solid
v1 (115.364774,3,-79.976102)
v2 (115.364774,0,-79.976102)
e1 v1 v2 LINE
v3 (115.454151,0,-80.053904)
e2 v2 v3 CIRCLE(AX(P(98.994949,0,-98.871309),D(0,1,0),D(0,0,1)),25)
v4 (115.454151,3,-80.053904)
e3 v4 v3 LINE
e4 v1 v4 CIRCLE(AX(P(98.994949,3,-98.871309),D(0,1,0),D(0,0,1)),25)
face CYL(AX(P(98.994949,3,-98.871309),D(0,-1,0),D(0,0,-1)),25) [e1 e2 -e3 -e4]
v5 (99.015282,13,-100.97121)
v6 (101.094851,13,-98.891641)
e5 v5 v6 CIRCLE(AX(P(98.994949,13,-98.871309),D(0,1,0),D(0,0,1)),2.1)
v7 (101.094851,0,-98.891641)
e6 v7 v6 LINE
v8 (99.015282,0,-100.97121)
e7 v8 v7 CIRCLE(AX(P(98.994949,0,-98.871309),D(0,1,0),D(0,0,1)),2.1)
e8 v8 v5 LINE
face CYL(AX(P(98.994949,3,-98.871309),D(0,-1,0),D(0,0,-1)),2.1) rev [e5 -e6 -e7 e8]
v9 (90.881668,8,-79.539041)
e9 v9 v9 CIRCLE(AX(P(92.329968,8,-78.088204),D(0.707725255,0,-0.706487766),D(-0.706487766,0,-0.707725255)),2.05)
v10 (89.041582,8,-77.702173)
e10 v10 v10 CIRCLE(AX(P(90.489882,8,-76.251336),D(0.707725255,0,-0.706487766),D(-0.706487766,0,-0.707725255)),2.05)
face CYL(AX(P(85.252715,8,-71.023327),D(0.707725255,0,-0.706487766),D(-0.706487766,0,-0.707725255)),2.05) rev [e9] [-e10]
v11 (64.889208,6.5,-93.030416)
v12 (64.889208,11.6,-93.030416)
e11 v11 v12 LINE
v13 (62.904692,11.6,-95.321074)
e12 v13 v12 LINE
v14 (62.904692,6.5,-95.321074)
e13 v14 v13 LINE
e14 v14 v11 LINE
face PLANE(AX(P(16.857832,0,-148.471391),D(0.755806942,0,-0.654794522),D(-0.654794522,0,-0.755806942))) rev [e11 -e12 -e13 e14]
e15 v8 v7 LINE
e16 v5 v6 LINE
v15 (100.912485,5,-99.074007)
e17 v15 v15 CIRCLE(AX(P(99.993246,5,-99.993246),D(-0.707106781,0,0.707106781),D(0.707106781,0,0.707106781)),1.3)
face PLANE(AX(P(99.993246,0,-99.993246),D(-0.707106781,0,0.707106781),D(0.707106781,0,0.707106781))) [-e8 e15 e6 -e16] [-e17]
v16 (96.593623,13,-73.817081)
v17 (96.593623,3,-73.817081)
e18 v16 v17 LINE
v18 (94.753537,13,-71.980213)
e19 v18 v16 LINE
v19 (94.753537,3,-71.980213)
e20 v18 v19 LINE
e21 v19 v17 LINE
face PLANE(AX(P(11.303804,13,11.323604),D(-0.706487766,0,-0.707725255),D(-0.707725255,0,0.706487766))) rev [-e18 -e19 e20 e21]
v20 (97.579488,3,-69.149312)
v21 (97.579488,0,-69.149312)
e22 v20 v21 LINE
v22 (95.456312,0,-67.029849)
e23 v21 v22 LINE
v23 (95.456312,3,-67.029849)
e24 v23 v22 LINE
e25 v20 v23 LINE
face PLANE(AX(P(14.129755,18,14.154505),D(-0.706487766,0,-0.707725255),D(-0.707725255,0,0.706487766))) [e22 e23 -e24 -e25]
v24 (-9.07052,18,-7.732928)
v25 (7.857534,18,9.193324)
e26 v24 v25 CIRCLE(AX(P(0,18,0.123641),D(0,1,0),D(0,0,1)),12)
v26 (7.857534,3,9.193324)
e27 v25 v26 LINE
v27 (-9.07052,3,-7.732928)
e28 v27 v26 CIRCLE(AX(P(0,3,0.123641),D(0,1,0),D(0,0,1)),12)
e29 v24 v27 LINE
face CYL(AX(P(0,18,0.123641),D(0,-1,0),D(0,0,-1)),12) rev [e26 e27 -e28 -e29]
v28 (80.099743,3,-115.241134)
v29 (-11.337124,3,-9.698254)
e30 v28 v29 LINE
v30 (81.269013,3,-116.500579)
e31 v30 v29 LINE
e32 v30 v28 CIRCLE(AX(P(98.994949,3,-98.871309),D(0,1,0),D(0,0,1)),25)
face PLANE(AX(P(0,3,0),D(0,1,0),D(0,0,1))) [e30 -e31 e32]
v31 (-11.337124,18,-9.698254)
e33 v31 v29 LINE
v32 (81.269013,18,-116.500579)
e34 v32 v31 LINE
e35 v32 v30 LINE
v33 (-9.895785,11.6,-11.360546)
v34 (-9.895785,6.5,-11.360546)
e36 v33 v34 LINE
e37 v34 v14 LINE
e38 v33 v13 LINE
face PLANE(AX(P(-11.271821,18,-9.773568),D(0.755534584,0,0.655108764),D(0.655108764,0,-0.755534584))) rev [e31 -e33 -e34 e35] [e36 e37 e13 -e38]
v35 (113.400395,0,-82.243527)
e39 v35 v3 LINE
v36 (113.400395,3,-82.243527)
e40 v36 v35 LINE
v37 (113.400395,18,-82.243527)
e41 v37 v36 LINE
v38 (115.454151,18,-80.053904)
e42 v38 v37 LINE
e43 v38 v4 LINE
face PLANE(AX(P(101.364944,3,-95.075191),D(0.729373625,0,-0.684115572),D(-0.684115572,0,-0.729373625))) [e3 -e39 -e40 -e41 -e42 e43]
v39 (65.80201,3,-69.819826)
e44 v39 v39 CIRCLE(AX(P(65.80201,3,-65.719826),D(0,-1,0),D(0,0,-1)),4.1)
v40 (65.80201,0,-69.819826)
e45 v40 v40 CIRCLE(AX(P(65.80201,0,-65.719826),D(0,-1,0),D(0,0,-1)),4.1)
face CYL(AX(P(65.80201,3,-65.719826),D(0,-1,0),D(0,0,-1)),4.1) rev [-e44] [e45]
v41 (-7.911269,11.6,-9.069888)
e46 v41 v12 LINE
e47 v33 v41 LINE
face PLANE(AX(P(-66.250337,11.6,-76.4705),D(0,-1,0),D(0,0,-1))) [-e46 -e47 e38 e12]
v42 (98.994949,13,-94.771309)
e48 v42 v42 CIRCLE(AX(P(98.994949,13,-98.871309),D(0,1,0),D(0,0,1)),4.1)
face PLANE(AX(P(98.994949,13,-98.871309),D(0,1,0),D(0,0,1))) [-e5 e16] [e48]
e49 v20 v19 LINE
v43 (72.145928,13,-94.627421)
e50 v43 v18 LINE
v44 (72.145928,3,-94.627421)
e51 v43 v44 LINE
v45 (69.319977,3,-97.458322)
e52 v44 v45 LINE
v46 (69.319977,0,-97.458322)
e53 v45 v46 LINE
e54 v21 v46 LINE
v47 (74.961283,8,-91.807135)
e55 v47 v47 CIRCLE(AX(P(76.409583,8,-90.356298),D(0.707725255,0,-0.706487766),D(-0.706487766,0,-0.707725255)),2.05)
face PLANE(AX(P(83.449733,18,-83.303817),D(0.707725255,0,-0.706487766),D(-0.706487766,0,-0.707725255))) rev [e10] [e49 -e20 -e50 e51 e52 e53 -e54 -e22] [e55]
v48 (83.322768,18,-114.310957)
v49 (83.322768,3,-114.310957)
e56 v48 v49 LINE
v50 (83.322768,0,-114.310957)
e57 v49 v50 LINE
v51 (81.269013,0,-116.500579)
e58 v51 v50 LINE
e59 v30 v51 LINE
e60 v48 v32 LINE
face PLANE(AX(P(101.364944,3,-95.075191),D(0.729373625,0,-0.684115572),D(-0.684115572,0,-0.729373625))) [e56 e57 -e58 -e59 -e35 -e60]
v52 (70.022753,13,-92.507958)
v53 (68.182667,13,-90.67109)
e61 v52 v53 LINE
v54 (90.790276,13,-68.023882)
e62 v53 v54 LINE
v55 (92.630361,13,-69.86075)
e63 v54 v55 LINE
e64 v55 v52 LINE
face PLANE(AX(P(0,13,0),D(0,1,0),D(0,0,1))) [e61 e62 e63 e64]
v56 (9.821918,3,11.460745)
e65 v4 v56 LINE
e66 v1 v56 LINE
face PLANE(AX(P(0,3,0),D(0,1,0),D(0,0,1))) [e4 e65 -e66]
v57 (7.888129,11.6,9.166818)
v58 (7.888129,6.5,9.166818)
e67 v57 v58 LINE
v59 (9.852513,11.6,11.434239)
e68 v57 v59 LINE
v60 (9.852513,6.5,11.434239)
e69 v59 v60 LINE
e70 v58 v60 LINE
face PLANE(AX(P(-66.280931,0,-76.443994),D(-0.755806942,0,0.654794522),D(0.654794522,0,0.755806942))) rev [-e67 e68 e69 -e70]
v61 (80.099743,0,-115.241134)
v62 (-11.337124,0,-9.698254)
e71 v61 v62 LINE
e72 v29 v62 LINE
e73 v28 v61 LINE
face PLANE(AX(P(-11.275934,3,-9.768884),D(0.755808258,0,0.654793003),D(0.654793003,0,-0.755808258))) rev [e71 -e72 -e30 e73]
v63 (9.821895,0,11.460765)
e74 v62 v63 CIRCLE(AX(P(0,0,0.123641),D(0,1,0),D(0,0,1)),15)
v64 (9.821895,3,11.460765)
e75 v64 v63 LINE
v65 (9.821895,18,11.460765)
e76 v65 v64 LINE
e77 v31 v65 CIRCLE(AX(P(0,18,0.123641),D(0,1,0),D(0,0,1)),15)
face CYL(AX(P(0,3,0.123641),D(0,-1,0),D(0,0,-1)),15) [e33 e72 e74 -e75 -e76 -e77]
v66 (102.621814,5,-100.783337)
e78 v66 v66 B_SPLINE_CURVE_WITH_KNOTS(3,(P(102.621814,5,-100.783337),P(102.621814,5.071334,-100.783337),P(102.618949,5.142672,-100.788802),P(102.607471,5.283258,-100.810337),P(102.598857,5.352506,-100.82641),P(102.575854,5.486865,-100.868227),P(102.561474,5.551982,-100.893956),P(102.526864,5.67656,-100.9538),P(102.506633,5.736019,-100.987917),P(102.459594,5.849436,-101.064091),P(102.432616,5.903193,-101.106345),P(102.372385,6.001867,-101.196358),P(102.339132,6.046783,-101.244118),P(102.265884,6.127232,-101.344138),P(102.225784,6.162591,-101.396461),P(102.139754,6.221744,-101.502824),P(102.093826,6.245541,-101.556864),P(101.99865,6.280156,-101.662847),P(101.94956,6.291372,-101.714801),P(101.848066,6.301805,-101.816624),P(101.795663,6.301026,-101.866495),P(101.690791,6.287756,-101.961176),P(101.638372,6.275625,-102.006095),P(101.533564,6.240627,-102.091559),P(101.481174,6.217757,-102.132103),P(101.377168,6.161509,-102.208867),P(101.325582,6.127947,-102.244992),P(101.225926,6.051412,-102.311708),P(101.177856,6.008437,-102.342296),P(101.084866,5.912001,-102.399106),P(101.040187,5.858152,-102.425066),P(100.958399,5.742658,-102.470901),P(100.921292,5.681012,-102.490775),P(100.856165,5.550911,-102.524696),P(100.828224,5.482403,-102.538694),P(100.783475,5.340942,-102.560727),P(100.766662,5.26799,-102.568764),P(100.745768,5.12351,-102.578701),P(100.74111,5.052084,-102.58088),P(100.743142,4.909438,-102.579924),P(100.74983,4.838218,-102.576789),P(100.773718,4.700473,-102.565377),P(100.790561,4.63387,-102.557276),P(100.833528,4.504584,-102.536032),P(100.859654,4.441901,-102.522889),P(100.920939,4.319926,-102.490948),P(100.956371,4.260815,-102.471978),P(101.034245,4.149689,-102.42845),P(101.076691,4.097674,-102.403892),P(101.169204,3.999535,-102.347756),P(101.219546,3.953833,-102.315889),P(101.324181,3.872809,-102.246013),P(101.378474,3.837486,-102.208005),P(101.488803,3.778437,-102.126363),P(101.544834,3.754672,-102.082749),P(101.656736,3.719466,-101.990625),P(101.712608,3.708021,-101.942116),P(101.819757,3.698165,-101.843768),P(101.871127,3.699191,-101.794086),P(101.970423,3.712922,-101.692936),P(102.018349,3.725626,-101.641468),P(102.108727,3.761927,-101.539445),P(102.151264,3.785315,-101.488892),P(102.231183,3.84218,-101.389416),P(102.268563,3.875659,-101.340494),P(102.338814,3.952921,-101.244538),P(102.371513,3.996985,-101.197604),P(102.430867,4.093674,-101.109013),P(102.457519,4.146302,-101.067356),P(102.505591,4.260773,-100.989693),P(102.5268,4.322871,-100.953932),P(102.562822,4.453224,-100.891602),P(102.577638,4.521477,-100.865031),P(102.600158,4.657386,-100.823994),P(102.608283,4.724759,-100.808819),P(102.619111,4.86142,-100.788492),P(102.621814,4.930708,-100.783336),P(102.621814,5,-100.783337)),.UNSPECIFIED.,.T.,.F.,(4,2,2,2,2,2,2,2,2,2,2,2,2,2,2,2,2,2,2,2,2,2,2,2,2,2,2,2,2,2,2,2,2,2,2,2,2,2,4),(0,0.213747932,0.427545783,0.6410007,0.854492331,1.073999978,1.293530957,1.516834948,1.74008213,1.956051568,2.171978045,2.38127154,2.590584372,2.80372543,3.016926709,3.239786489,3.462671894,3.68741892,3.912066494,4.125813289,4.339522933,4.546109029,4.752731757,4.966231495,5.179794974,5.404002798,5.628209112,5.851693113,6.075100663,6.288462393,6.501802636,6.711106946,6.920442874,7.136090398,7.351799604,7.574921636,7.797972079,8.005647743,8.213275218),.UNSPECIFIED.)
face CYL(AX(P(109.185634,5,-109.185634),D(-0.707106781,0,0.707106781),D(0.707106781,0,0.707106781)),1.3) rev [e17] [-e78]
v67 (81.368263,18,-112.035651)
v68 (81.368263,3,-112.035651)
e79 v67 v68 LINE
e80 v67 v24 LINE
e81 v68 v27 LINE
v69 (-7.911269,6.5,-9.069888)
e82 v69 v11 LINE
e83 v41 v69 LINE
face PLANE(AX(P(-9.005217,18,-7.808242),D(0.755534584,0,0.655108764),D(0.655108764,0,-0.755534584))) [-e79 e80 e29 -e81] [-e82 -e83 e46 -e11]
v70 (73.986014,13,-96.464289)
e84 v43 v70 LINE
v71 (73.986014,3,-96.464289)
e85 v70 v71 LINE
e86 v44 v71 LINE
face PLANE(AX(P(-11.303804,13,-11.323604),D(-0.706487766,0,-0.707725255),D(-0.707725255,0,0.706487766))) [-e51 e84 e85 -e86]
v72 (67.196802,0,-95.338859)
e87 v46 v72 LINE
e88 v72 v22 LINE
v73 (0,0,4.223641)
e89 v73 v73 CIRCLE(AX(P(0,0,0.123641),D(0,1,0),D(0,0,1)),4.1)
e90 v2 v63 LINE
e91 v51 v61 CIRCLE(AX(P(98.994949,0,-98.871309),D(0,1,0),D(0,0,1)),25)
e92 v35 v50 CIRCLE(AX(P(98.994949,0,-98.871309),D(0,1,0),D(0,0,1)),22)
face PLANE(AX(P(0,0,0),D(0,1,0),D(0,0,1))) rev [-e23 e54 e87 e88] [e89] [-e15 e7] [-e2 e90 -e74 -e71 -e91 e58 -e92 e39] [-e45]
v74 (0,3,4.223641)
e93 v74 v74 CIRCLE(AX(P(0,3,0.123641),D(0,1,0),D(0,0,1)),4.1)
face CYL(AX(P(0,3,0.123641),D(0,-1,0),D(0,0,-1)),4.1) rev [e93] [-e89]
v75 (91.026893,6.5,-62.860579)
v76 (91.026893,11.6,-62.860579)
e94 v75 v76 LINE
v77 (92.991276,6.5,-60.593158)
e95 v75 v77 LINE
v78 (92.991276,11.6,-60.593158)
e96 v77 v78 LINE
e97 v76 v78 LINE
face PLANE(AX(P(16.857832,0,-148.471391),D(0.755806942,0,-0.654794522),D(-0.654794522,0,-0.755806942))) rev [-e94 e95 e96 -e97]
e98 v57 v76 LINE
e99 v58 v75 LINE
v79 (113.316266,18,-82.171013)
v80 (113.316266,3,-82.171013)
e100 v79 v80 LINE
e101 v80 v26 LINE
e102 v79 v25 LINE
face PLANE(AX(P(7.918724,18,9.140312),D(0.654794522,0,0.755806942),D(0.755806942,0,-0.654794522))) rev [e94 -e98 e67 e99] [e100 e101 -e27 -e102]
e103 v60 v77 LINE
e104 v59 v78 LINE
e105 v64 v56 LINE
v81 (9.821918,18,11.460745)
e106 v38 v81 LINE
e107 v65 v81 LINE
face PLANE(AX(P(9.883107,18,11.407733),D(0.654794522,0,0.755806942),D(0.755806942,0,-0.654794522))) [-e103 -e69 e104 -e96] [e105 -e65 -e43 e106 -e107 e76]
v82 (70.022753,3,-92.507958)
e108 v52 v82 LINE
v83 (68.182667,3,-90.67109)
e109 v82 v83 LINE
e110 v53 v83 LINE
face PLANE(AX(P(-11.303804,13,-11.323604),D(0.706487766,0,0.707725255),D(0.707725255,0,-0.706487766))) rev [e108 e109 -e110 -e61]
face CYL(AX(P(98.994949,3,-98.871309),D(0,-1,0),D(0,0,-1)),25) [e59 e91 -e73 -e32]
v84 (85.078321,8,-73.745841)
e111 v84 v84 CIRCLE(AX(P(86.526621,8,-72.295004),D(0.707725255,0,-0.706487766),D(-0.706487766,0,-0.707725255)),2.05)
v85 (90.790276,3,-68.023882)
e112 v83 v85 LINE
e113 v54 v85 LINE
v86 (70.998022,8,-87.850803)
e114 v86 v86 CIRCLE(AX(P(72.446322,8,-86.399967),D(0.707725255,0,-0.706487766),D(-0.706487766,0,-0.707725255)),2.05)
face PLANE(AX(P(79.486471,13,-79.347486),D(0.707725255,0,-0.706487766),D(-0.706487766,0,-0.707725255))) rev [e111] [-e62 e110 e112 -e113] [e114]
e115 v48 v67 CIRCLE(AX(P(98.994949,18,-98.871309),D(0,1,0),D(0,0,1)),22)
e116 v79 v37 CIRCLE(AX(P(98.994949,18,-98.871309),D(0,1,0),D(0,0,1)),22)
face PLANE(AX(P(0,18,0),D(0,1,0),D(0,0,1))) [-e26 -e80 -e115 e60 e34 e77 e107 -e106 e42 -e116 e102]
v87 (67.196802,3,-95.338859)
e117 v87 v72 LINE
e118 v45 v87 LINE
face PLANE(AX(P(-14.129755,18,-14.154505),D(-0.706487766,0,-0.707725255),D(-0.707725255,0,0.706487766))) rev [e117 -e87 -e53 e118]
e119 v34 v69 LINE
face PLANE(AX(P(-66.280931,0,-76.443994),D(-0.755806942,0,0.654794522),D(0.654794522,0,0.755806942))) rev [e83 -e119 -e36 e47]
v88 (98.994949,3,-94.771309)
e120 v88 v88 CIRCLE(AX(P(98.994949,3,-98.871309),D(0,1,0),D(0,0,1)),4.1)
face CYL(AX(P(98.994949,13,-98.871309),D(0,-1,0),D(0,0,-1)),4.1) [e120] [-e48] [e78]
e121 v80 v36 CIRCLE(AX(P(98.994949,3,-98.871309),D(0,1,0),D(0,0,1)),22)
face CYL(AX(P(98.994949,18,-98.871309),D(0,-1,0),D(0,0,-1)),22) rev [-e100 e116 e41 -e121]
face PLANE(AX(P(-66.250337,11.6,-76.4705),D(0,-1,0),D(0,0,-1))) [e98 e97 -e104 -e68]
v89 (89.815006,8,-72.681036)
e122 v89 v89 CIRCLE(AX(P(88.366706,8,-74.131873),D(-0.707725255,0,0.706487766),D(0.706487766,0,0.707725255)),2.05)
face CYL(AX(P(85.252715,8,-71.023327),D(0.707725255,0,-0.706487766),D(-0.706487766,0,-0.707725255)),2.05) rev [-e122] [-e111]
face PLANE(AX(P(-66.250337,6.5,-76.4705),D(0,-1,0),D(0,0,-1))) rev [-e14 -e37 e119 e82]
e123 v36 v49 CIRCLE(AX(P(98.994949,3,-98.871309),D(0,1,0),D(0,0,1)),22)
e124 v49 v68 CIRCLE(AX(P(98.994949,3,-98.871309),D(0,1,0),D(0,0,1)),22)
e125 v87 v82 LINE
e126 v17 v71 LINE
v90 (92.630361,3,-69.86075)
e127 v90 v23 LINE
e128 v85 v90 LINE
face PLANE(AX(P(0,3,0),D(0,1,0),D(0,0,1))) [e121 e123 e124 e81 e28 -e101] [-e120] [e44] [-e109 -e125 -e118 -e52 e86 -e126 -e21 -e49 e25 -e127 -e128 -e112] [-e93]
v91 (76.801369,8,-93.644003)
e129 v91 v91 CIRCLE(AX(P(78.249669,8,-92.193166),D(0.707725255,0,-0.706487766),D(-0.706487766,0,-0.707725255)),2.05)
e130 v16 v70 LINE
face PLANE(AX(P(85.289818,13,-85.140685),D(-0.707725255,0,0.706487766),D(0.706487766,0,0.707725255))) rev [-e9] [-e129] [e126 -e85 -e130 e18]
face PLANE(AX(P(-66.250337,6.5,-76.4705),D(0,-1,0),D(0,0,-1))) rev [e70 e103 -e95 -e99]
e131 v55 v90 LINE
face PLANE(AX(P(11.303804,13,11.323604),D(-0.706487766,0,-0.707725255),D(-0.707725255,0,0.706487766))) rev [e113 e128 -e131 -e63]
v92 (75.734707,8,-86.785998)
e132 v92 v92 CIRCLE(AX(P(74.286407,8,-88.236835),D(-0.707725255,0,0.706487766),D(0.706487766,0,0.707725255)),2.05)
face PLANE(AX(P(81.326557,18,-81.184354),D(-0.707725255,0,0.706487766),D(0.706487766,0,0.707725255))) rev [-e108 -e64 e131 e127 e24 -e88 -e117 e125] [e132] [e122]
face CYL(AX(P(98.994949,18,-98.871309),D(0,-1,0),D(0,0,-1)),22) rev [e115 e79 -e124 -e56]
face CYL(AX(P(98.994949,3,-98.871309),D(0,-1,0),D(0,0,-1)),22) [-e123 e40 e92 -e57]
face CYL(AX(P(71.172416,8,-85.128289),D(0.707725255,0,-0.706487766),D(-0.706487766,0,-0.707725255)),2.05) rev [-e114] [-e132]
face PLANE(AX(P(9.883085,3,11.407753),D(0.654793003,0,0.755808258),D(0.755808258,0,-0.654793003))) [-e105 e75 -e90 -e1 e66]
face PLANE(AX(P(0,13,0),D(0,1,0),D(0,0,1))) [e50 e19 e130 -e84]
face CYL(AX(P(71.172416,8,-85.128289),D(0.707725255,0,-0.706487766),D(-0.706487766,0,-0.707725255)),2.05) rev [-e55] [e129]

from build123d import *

# Parameters (mm, degrees)
SKETCH_2_R               = 2.1
SKETCH_2_R_2             = 4.1
EXTRUDE_2_DEPTH          = 3
EXTRUDE_3_DEPTH          = 15
SKETCH_4_R               = 4.1
SKETCH_4_R_2             = 2.1
EXTRUDE_4_DEPTH          = 10
EXTRUDE_START            = -13
EXTRUDE_5_DEPTH          = 13
SKETCH_7_R               = 1.3
CUT_EXTRUDE_1_DEPTH      = 13
CUT_EXTRUDE_2_DEPTH      = 174.68818701
CUT_EXTRUDE_2_DEPTH_BACK = 174.68818701
SKETCH_8_W               = 110
SKETCH_8_H               = 2.6
SKETCH_8_H_2             = 2.5
CUT_EXTRUDE_3_DEPTH      = 172.969913078
CUT_EXTRUDE_3_DEPTH_BACK = 172.969913078
EXTRUDE_6_DEPTH          = 10
SKETCH_11_R              = 2
CUT_EXTRUDE_4_DEPTH      = 10
SKETCH_13_R              = 2.05
CUT_EXTRUDE_5_DEPTH      = 10
SKETCH_14_R              = 4.1
EXTRUDE_7_DEPTH          = 3
CUT_EXTRUDE_6_DEPTH      = 3


# Read off the part's stored shape, not the designer's step: 凸台-拉伸3, 凸台-拉伸5
with BuildPart() as part:
    # 草图2 → 凸台-拉伸2 (new body)
    with BuildSketch(Plane(origin=(0, 0, 0), x_dir=(1, 0, 0), z_dir=(0, 1, 0))):
        with BuildLine():
            Line((80.099742919, 115.241133642), (-11.337123868, 9.698254241))
            ThreePointArc((-11.337123868, 9.698254241), (-10.606601718, -10.730242528), (9.821895051, -11.460764678))
            Line((9.821895051, -11.460764678), (115.364774452, 79.976102109))
            ThreePointArc((115.364774452, 79.976102109), (115.409508589, 80.014950331), (115.454150533, 80.053904459))
            Line((115.454150533, 80.053904459), (113.400395441, 82.243526883))
            ThreePointArc((113.400395441, 82.243526883), (115.041169115, 113.92185113), (83.322768112, 114.310956698))
            Line((83.322768112, 114.310956698), (81.26901302, 116.500579122))
            ThreePointArc((81.26901302, 116.500579122), (80.673552706, 115.880906565), (80.099742919, 115.241133642))
        make_face()
        with Locations(Location((98.994949366, 98.871308556, 0), (0, 0, 270))):
            Circle(SKETCH_2_R, mode=Mode.SUBTRACT)
        with Locations(Location((0, -0.12364081, 0), (0, 0, 270))):
            Circle(SKETCH_2_R_2, mode=Mode.SUBTRACT)
        with Locations(Location((70.710678119, 70.587037309, 0), (0, 0, 270))):
            Circle(SKETCH_2_R_2, mode=Mode.SUBTRACT)
    extrude(amount=EXTRUDE_2_DEPTH)

    # 凸台-拉伸3 outline → 凸台-拉伸3 (add)
    with BuildSketch(Plane(origin=(0, 3, 0), x_dir=(1, 0, 0), z_dir=(0, 1, 0))):
        with BuildLine():
            ThreePointArc((-11.337123868, 9.698254241), (-10.606601718, -10.730242528), (9.821895051, -11.460764678))
            Line((9.821895051, -11.460764678), (115.454150533, 80.053904459))
            Line((115.454150533, 80.053904459), (113.400395441, 82.243526883))
            ThreePointArc((113.400395441, 82.243526883), (113.358376595, 82.207216674), (113.316266225, 82.171012648))
            Line((113.316266225, 82.171012648), (7.857534265, -9.193324116))
            ThreePointArc((7.857534265, -9.193324116), (-8.484829636, -8.609373899), (-9.07051987, 7.732927734))
            Line((-9.07051987, 7.732927734), (81.368262538, 112.03565098))
            ThreePointArc((81.368262538, 112.03565098), (82.306692779, 113.206652712), (83.322768112, 114.310956698))
            Line((83.322768112, 114.310956698), (81.26901302, 116.500579122))
            Line((81.26901302, 116.500579122), (-11.337123868, 9.698254241))
        make_face()
    extrude(amount=EXTRUDE_3_DEPTH)

    # 草图4 → 凸台-拉伸4 (add)
    with BuildSketch(Plane(origin=(0, 3, 0), x_dir=(1, 0, 0), z_dir=(0, 1, 0))):
        with Locations(Location((98.994949366, 98.871308556, 0), (0, 0, 270))):
            Circle(SKETCH_4_R)
        with Locations(Location((98.994949366, 98.871308556, 0), (0, 0, 270))):
            Circle(SKETCH_4_R_2, mode=Mode.SUBTRACT)
    extrude(amount=EXTRUDE_4_DEPTH)

    # 凸台-拉伸5 outline → 凸台-拉伸5 (add)
    with BuildSketch(Plane(origin=(0, 13, 0), x_dir=(1, 0, 0), z_dir=(0, 1, 0)).offset(EXTRUDE_START)):
        with BuildLine():
            ThreePointArc((101.094850935, 98.891640782), (100.479873606, 100.356232796), (99.015281592, 100.971210125))
            Line((99.015281592, 100.971210125), (101.094850935, 98.891640782))
        make_face()
    extrude(amount=EXTRUDE_5_DEPTH)

    # 草图7 → 切除-拉伸1 (cut)
    with BuildSketch(Plane(origin=(99.993245858, 0, -99.993245858), x_dir=(0.7071067811865475, 0, 0.7071067811865477), z_dir=(-0.7071067811865477, 0, 0.7071067811865475))):
        with Locations((0, 5)):
            Circle(SKETCH_7_R)
    extrude(amount=-CUT_EXTRUDE_1_DEPTH, mode=Mode.SUBTRACT)

    # 草图8 → 切除-拉伸2 (cut, two sides: drawn at the far end of the back side and taken through both)
    with BuildSketch(Plane(origin=(9.883107451, 0, 11.40773322), x_dir=(0.75580694217799, 0, -0.6547945220873159), z_dir=(0.6547945220873159, 0, 0.75580694217799)).offset(-CUT_EXTRUDE_2_DEPTH_BACK)):
        with Locations((54.959520341, 10.3)):
            Rectangle(SKETCH_8_W, SKETCH_8_H)
        with Locations((54.959520341, 7.75)):
            Rectangle(SKETCH_8_W, SKETCH_8_H_2)
    extrude(amount=CUT_EXTRUDE_2_DEPTH + CUT_EXTRUDE_2_DEPTH_BACK, mode=Mode.SUBTRACT)

    # 草图9 → 切除-拉伸3 (cut, two sides: drawn at the far end of the back side and taken through both)
    with BuildSketch(Plane.XZ.offset(-CUT_EXTRUDE_3_DEPTH_BACK)):
        Polygon((83.449732713, -83.303817091), (81.326556947, -81.184353794), (67.196801633, -95.338858899), (69.319977399, -97.458322196), align=None)
        Polygon((95.456312261, -67.02984869), (81.326556947, -81.184353794), (83.449732713, -83.303817091), (97.579488027, -69.149311987), align=None)
    extrude(amount=CUT_EXTRUDE_3_DEPTH + CUT_EXTRUDE_3_DEPTH_BACK, mode=Mode.SUBTRACT)

    # 草图10 → 凸台-拉伸6 (add)
    with BuildSketch(Plane(origin=(0, 3, 0), x_dir=(1, 0, 0), z_dir=(0, 1, 0))):
        Polygon((81.326556947, 81.184353794), (70.022752696, 92.507957878), (68.182667032, 90.671089687), (79.486471284, 79.347485603), align=None)
        Polygon((92.630361199, 69.86074971), (81.326556947, 81.184353794), (79.486471284, 79.347485603), (90.790275535, 68.02388152), align=None)
        Polygon((73.986014125, 96.464289366), (72.145928462, 94.627421175), (83.449732713, 83.303817091), (94.753536964, 71.980213008), (96.593622628, 73.817081198), align=None)
    extrude(amount=EXTRUDE_6_DEPTH)

    # 草图11 → 切除-拉伸4 (cut)
    with BuildSketch(Plane(origin=(85.289818377, 0, -85.140685282), x_dir=(-0.7064877657092933, 0, -0.707725255238988), z_dir=(0.707725255238988, 0, -0.7064877657092933))):
        with Locations((-9.96499851, 8)):
            Circle(SKETCH_11_R)
        with Locations((9.96499851, 8)):
            Circle(SKETCH_11_R)
    extrude(amount=-CUT_EXTRUDE_4_DEPTH, mode=Mode.SUBTRACT)

    # 草图13 → 切除-拉伸5 (cut)
    with BuildSketch(Plane(origin=(85.289818377, 0, -85.140685282), x_dir=(-0.7064877657092933, 0, -0.707725255238988), z_dir=(0.707725255238988, 0, -0.7064877657092933))):
        with Locations((-9.96499851, 8)):
            Circle(SKETCH_13_R)
        with Locations((9.964998511, 8)):
            Circle(SKETCH_13_R)
    extrude(amount=-CUT_EXTRUDE_5_DEPTH, mode=Mode.SUBTRACT)

    # 草图14 → 凸台-拉伸7 (add)
    with BuildSketch(Plane.XZ):
        with Locations((70.710678119, -70.587037309)):
            Circle(SKETCH_14_R)
    extrude(amount=-EXTRUDE_7_DEPTH)

    # 草图15 → 切除-拉伸6 (cut)
    with BuildSketch(Plane.XZ):
        with BuildLine():
            ThreePointArc((69.902009877, -65.719825747), (67.369828397, -61.931429637), (62.901061054, -62.822500095))
            Line((62.901061054, -62.822500095), (65.802009877, -65.719825747))
            Line((65.802009877, -65.719825747), (68.702958699, -68.617151398))
            ThreePointArc((68.702958699, -68.617151398), (69.590405987, -67.287644267), (69.902009877, -65.719825747))
        make_face()
        with BuildLine():
            Line((65.802009877, -65.719825747), (62.901061054, -62.822500095))
            ThreePointArc((62.901061054, -62.822500095), (62.904684226, -68.620774569), (68.702958699, -68.617151398))
            Line((68.702958699, -68.617151398), (65.802009877, -65.719825747))
        make_face()
    extrude(amount=-CUT_EXTRUDE_6_DEPTH, mode=Mode.SUBTRACT)


solid = part.part
